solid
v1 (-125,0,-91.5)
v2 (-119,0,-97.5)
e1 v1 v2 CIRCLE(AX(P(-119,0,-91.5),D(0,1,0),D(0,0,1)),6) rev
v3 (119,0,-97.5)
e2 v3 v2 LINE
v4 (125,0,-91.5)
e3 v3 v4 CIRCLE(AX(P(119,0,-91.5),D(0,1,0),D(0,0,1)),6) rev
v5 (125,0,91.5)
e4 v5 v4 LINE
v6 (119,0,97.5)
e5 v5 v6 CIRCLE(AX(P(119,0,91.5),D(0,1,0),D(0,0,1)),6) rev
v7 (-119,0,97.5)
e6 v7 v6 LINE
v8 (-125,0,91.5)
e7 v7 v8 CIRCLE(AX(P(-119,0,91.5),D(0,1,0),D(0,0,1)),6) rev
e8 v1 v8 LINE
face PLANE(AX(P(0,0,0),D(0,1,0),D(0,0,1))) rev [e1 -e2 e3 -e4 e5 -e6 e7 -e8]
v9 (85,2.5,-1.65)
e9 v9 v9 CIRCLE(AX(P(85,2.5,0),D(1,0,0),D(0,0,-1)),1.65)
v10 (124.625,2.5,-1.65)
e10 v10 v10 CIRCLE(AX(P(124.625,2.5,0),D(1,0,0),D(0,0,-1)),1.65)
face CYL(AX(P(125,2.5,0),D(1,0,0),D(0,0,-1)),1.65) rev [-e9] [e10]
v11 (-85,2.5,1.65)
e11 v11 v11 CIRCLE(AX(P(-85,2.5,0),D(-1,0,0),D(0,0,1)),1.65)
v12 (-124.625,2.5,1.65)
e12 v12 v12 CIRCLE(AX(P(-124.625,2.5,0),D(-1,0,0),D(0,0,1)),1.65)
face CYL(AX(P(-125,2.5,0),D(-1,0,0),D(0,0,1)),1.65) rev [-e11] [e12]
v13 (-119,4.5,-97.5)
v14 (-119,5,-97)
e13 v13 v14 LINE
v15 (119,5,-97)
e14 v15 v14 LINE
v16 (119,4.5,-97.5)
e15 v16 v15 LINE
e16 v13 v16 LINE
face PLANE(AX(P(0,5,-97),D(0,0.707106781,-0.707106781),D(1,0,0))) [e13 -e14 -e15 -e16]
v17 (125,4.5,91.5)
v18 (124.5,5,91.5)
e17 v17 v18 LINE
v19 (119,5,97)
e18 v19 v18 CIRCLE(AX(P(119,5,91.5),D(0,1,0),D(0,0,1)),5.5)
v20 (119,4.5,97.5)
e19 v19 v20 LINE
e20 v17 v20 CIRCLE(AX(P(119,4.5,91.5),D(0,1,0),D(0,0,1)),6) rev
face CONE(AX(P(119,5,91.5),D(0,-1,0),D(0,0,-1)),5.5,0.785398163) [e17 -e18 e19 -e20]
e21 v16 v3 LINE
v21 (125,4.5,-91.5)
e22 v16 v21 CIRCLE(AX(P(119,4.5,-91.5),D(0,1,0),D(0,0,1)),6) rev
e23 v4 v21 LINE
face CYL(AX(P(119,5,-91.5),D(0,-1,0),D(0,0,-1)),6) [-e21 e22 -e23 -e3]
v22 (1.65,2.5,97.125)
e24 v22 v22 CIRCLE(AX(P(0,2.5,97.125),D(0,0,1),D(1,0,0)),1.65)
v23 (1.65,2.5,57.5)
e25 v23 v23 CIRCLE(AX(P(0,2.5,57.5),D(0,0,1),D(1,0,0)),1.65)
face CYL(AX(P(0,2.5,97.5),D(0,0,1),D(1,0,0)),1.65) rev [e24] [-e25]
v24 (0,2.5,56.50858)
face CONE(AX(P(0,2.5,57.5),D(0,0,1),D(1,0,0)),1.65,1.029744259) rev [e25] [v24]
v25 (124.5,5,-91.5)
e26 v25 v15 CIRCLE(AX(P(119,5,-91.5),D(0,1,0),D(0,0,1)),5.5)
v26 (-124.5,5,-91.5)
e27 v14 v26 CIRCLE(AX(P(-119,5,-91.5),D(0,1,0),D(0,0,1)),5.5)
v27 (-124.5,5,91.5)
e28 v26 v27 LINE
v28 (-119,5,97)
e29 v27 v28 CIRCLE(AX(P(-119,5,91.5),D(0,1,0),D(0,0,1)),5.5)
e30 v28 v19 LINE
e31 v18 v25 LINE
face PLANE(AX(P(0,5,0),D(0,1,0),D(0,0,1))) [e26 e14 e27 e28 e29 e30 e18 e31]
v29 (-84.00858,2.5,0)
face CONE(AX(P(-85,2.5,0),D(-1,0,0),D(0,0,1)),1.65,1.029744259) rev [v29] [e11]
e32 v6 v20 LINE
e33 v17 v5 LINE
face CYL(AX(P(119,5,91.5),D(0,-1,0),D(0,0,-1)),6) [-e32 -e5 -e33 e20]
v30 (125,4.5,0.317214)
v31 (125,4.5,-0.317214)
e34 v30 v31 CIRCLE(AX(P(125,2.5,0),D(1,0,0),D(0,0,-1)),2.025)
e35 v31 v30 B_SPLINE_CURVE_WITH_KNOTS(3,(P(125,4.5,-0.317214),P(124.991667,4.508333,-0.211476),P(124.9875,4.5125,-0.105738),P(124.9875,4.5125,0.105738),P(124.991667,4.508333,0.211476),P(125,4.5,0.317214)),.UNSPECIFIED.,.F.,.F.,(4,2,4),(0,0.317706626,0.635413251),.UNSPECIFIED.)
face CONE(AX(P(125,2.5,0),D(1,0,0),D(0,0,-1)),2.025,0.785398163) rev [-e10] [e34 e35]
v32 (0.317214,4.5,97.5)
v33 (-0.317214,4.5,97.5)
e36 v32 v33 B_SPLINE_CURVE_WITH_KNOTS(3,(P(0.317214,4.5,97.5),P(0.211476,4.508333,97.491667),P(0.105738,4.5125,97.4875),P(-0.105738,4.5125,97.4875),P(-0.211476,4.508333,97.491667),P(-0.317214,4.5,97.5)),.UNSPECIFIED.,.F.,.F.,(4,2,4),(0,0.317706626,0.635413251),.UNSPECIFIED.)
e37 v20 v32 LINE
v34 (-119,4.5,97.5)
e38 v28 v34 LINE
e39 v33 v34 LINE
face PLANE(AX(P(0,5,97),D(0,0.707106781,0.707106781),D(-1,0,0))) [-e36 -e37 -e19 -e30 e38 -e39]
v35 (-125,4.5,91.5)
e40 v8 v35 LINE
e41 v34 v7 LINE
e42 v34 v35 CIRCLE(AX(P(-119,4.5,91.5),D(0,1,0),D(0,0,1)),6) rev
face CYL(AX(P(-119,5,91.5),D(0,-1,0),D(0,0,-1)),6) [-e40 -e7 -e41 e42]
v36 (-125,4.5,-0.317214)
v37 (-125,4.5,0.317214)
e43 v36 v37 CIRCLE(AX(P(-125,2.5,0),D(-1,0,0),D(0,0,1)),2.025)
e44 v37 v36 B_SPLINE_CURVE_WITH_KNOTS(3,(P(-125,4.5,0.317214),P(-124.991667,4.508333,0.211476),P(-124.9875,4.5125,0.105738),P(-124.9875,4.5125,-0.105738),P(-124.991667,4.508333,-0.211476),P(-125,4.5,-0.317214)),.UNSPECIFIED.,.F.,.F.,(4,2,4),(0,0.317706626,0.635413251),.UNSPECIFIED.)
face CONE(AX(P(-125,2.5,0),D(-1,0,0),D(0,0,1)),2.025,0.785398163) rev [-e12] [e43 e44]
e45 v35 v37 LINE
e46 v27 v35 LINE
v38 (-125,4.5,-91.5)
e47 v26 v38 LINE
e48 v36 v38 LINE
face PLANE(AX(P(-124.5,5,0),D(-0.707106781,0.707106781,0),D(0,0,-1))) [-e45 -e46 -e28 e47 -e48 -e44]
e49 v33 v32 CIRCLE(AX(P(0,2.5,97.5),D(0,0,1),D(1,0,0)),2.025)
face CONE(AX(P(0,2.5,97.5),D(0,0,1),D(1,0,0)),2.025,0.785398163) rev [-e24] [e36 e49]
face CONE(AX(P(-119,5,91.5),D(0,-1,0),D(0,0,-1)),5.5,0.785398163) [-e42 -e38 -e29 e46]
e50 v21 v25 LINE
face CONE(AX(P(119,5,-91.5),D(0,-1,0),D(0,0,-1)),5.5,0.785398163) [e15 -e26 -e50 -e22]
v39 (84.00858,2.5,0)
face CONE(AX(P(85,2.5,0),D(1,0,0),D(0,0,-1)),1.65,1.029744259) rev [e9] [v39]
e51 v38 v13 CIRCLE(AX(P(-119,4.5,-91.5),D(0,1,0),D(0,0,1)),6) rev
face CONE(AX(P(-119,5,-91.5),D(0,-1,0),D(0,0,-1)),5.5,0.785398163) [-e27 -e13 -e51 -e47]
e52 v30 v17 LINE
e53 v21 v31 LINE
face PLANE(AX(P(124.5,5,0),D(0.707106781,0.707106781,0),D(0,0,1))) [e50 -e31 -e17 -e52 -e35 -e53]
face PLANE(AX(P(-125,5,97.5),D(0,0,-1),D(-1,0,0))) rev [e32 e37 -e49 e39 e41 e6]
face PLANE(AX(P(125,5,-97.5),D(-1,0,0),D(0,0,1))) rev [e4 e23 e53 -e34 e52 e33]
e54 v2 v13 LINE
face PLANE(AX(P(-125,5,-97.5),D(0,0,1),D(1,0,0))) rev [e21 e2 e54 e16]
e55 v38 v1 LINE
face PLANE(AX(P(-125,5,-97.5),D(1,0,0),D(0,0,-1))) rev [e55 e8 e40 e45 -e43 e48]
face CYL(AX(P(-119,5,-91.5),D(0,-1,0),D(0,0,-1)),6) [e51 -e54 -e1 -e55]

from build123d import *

# Parameters (mm, degrees)
SKETCH_1_W                   = 250
SKETCH_1_H                   = 195
EXTRUDE_377_DEPTH            = 5
HOLE_WIZARD_1_M4_D           = 3.3
HOLE_WIZARD_1_M4_DEPTH       = 40
HOLE_WIZARD_1_M4_CSINK_D     = 4.05
HOLE_WIZARD_1_M4_CSINK_ANGLE = 90
HOLE_WIZARD_1_M4_TIP         = 0.991420021
HOLE_WIZARD_2_M4_D           = 3.3
HOLE_WIZARD_2_M4_DEPTH       = 40
HOLE_WIZARD_2_M4_CSINK_D     = 4.05
HOLE_WIZARD_2_M4_CSINK_ANGLE = 90
HOLE_WIZARD_2_M4_TIP         = 0.991420021
HOLE_WIZARD_3_M4_D           = 3.3
HOLE_WIZARD_3_M4_DEPTH       = 40
HOLE_WIZARD_3_M4_CSINK_D     = 4.05
HOLE_WIZARD_3_M4_CSINK_ANGLE = 90
HOLE_WIZARD_3_M4_TIP         = 0.991420021
FILLET_1_R                   = 6
CHAMFER_1_SIZE               = 0.5


with BuildPart() as part:
    # Эскиз1 → Extrude 377 (new body)
    with BuildSketch(Plane(origin=(0, 0, 0), x_dir=(1, 0, 0), z_dir=(0, 1, 0))):
        Rectangle(SKETCH_1_W, SKETCH_1_H)
    extrude(amount=EXTRUDE_377_DEPTH)

    # Резьба-1-M4
    with Locations(Plane(origin=(125, 0, 0), x_dir=(0, 0, -1), z_dir=(1, 0, 0))):
        with Locations((0, 2.5)):
            CounterSinkHole(HOLE_WIZARD_1_M4_D / 2, HOLE_WIZARD_1_M4_CSINK_D / 2, depth=HOLE_WIZARD_1_M4_DEPTH, counter_sink_angle=HOLE_WIZARD_1_M4_CSINK_ANGLE)
            with Locations((0, 0, -(HOLE_WIZARD_1_M4_DEPTH + HOLE_WIZARD_1_M4_TIP / 2))):  # 118° drill point
                Cone(0, HOLE_WIZARD_1_M4_D / 2, HOLE_WIZARD_1_M4_TIP, mode=Mode.SUBTRACT)

    # Резьба-2-M4
    with Locations(Plane.ZY.offset(125)):
        with Locations((0, 2.5)):
            CounterSinkHole(HOLE_WIZARD_2_M4_D / 2, HOLE_WIZARD_2_M4_CSINK_D / 2, depth=HOLE_WIZARD_2_M4_DEPTH, counter_sink_angle=HOLE_WIZARD_2_M4_CSINK_ANGLE)
            with Locations((0, 0, -(HOLE_WIZARD_2_M4_DEPTH + HOLE_WIZARD_2_M4_TIP / 2))):  # 118° drill point
                Cone(0, HOLE_WIZARD_2_M4_D / 2, HOLE_WIZARD_2_M4_TIP, mode=Mode.SUBTRACT)

    # Резьба-3-M4
    with Locations(Plane.XY.offset(97.5)):
        with Locations((0, 2.5)):
            CounterSinkHole(HOLE_WIZARD_3_M4_D / 2, HOLE_WIZARD_3_M4_CSINK_D / 2, depth=HOLE_WIZARD_3_M4_DEPTH, counter_sink_angle=HOLE_WIZARD_3_M4_CSINK_ANGLE)
            with Locations((0, 0, -(HOLE_WIZARD_3_M4_DEPTH + HOLE_WIZARD_3_M4_TIP / 2))):  # 118° drill point
                Cone(0, HOLE_WIZARD_3_M4_D / 2, HOLE_WIZARD_3_M4_TIP, mode=Mode.SUBTRACT)

    # Скругление1
    fillet_1_edges = [part.edges().sort_by_distance(p)[0] for p in [
        (125, 2.5, 97.5),
        (-125, 2.5, 97.5),
        (-125, 2.5, -97.5),
        (125, 2.5, -97.5),
    ]]
    fillet(fillet_1_edges, radius=FILLET_1_R)

    # Фаска1
    # the kernel refuses this chamfer: 0.5 mm, written as the material it takes off along each edge
    with BuildSketch(Plane(origin=(-119, 5, -97.5), x_dir=(0, -0.999621916911297, -0.0274958766105822), z_dir=(1, 0, 0))) as chamfer_1_piece_1:
        Polygon((CHAMFER_1_SIZE * 0.999621916911, -CHAMFER_1_SIZE * 0.0274958766106), (-CHAMFER_1_SIZE * 0.0274958766106, -CHAMFER_1_SIZE * 0.999621916911), (0, 0), align=None)
    extrude(amount=238, mode=Mode.SUBTRACT)
    with BuildSketch(Plane(origin=(125, 5, -91.5), x_dir=(-0.9996219169112968, 0.02749587661058574, 0), z_dir=(0, 0, 1)), Plane(origin=(-125, 5, 91.5), x_dir=(0.9996219169112968, 0.02749587661058574, 0), z_dir=(0, 0, -1))) as chamfer_1_piece_2:
        Polygon((CHAMFER_1_SIZE * 0.999621916911, CHAMFER_1_SIZE * 0.0274958766106), (-CHAMFER_1_SIZE * 0.0274958766106, CHAMFER_1_SIZE * 0.999621916911), (0, 0), align=None)
    extrude(amount=183, mode=Mode.SUBTRACT)
    with BuildSketch(Plane(origin=(119, 5, 97.5), x_dir=(0, 0.02749587661058574, -0.9996219169112968), z_dir=(-1, 0, 0))) as chamfer_1_piece_3:
        Polygon((CHAMFER_1_SIZE * 0.999621916911, CHAMFER_1_SIZE * 0.0274958766106), (-CHAMFER_1_SIZE * 0.0274958766106, CHAMFER_1_SIZE * 0.999621916911), (0, 0), align=None)
    extrude(amount=238, mode=Mode.SUBTRACT)
    with BuildSketch(Plane(origin=(-119, 5, 91.5), x_dir=(0, 0, 1), z_dir=(1, 0, 0))) as chamfer_1_piece_4:
        Polygon((6 - CHAMFER_1_SIZE, 0), (6, CHAMFER_1_SIZE), (6, 0), align=None)
    revolve(axis=Axis((-119, 5, 91.5), (0, -1, 0)), revolution_arc=90, mode=Mode.SUBTRACT)
    with BuildSketch(Plane(origin=(119, 5, 91.5), x_dir=(0, 0, 1), z_dir=(-1, 0, 0))) as chamfer_1_piece_5:
        Polygon((6 - CHAMFER_1_SIZE, 0), (6, -CHAMFER_1_SIZE), (6, 0), align=None)
    revolve(axis=Axis((119, 5, 91.5), (0, 1, 0)), revolution_arc=90, mode=Mode.SUBTRACT)
    with BuildSketch(Plane(origin=(-119, 5, -91.5), x_dir=(0, 0, -1), z_dir=(1, 0, 0))) as chamfer_1_piece_6:
        Polygon((6, -CHAMFER_1_SIZE), (6 - CHAMFER_1_SIZE, 0), (6, 0), align=None)
    revolve(axis=Axis((-119, 5, -91.5), (0, 1, 0)), revolution_arc=90, mode=Mode.SUBTRACT)
    with BuildSketch(Plane(origin=(119, 5, -91.5), x_dir=(0, 0, -1), z_dir=(-1, 0, 0))) as chamfer_1_piece_7:
        Polygon((6, CHAMFER_1_SIZE), (6 - CHAMFER_1_SIZE, 0), (6, 0), align=None)
    revolve(axis=Axis((119, 5, -91.5), (0, -1, 0)), revolution_arc=90, mode=Mode.SUBTRACT)


solid = part.part
